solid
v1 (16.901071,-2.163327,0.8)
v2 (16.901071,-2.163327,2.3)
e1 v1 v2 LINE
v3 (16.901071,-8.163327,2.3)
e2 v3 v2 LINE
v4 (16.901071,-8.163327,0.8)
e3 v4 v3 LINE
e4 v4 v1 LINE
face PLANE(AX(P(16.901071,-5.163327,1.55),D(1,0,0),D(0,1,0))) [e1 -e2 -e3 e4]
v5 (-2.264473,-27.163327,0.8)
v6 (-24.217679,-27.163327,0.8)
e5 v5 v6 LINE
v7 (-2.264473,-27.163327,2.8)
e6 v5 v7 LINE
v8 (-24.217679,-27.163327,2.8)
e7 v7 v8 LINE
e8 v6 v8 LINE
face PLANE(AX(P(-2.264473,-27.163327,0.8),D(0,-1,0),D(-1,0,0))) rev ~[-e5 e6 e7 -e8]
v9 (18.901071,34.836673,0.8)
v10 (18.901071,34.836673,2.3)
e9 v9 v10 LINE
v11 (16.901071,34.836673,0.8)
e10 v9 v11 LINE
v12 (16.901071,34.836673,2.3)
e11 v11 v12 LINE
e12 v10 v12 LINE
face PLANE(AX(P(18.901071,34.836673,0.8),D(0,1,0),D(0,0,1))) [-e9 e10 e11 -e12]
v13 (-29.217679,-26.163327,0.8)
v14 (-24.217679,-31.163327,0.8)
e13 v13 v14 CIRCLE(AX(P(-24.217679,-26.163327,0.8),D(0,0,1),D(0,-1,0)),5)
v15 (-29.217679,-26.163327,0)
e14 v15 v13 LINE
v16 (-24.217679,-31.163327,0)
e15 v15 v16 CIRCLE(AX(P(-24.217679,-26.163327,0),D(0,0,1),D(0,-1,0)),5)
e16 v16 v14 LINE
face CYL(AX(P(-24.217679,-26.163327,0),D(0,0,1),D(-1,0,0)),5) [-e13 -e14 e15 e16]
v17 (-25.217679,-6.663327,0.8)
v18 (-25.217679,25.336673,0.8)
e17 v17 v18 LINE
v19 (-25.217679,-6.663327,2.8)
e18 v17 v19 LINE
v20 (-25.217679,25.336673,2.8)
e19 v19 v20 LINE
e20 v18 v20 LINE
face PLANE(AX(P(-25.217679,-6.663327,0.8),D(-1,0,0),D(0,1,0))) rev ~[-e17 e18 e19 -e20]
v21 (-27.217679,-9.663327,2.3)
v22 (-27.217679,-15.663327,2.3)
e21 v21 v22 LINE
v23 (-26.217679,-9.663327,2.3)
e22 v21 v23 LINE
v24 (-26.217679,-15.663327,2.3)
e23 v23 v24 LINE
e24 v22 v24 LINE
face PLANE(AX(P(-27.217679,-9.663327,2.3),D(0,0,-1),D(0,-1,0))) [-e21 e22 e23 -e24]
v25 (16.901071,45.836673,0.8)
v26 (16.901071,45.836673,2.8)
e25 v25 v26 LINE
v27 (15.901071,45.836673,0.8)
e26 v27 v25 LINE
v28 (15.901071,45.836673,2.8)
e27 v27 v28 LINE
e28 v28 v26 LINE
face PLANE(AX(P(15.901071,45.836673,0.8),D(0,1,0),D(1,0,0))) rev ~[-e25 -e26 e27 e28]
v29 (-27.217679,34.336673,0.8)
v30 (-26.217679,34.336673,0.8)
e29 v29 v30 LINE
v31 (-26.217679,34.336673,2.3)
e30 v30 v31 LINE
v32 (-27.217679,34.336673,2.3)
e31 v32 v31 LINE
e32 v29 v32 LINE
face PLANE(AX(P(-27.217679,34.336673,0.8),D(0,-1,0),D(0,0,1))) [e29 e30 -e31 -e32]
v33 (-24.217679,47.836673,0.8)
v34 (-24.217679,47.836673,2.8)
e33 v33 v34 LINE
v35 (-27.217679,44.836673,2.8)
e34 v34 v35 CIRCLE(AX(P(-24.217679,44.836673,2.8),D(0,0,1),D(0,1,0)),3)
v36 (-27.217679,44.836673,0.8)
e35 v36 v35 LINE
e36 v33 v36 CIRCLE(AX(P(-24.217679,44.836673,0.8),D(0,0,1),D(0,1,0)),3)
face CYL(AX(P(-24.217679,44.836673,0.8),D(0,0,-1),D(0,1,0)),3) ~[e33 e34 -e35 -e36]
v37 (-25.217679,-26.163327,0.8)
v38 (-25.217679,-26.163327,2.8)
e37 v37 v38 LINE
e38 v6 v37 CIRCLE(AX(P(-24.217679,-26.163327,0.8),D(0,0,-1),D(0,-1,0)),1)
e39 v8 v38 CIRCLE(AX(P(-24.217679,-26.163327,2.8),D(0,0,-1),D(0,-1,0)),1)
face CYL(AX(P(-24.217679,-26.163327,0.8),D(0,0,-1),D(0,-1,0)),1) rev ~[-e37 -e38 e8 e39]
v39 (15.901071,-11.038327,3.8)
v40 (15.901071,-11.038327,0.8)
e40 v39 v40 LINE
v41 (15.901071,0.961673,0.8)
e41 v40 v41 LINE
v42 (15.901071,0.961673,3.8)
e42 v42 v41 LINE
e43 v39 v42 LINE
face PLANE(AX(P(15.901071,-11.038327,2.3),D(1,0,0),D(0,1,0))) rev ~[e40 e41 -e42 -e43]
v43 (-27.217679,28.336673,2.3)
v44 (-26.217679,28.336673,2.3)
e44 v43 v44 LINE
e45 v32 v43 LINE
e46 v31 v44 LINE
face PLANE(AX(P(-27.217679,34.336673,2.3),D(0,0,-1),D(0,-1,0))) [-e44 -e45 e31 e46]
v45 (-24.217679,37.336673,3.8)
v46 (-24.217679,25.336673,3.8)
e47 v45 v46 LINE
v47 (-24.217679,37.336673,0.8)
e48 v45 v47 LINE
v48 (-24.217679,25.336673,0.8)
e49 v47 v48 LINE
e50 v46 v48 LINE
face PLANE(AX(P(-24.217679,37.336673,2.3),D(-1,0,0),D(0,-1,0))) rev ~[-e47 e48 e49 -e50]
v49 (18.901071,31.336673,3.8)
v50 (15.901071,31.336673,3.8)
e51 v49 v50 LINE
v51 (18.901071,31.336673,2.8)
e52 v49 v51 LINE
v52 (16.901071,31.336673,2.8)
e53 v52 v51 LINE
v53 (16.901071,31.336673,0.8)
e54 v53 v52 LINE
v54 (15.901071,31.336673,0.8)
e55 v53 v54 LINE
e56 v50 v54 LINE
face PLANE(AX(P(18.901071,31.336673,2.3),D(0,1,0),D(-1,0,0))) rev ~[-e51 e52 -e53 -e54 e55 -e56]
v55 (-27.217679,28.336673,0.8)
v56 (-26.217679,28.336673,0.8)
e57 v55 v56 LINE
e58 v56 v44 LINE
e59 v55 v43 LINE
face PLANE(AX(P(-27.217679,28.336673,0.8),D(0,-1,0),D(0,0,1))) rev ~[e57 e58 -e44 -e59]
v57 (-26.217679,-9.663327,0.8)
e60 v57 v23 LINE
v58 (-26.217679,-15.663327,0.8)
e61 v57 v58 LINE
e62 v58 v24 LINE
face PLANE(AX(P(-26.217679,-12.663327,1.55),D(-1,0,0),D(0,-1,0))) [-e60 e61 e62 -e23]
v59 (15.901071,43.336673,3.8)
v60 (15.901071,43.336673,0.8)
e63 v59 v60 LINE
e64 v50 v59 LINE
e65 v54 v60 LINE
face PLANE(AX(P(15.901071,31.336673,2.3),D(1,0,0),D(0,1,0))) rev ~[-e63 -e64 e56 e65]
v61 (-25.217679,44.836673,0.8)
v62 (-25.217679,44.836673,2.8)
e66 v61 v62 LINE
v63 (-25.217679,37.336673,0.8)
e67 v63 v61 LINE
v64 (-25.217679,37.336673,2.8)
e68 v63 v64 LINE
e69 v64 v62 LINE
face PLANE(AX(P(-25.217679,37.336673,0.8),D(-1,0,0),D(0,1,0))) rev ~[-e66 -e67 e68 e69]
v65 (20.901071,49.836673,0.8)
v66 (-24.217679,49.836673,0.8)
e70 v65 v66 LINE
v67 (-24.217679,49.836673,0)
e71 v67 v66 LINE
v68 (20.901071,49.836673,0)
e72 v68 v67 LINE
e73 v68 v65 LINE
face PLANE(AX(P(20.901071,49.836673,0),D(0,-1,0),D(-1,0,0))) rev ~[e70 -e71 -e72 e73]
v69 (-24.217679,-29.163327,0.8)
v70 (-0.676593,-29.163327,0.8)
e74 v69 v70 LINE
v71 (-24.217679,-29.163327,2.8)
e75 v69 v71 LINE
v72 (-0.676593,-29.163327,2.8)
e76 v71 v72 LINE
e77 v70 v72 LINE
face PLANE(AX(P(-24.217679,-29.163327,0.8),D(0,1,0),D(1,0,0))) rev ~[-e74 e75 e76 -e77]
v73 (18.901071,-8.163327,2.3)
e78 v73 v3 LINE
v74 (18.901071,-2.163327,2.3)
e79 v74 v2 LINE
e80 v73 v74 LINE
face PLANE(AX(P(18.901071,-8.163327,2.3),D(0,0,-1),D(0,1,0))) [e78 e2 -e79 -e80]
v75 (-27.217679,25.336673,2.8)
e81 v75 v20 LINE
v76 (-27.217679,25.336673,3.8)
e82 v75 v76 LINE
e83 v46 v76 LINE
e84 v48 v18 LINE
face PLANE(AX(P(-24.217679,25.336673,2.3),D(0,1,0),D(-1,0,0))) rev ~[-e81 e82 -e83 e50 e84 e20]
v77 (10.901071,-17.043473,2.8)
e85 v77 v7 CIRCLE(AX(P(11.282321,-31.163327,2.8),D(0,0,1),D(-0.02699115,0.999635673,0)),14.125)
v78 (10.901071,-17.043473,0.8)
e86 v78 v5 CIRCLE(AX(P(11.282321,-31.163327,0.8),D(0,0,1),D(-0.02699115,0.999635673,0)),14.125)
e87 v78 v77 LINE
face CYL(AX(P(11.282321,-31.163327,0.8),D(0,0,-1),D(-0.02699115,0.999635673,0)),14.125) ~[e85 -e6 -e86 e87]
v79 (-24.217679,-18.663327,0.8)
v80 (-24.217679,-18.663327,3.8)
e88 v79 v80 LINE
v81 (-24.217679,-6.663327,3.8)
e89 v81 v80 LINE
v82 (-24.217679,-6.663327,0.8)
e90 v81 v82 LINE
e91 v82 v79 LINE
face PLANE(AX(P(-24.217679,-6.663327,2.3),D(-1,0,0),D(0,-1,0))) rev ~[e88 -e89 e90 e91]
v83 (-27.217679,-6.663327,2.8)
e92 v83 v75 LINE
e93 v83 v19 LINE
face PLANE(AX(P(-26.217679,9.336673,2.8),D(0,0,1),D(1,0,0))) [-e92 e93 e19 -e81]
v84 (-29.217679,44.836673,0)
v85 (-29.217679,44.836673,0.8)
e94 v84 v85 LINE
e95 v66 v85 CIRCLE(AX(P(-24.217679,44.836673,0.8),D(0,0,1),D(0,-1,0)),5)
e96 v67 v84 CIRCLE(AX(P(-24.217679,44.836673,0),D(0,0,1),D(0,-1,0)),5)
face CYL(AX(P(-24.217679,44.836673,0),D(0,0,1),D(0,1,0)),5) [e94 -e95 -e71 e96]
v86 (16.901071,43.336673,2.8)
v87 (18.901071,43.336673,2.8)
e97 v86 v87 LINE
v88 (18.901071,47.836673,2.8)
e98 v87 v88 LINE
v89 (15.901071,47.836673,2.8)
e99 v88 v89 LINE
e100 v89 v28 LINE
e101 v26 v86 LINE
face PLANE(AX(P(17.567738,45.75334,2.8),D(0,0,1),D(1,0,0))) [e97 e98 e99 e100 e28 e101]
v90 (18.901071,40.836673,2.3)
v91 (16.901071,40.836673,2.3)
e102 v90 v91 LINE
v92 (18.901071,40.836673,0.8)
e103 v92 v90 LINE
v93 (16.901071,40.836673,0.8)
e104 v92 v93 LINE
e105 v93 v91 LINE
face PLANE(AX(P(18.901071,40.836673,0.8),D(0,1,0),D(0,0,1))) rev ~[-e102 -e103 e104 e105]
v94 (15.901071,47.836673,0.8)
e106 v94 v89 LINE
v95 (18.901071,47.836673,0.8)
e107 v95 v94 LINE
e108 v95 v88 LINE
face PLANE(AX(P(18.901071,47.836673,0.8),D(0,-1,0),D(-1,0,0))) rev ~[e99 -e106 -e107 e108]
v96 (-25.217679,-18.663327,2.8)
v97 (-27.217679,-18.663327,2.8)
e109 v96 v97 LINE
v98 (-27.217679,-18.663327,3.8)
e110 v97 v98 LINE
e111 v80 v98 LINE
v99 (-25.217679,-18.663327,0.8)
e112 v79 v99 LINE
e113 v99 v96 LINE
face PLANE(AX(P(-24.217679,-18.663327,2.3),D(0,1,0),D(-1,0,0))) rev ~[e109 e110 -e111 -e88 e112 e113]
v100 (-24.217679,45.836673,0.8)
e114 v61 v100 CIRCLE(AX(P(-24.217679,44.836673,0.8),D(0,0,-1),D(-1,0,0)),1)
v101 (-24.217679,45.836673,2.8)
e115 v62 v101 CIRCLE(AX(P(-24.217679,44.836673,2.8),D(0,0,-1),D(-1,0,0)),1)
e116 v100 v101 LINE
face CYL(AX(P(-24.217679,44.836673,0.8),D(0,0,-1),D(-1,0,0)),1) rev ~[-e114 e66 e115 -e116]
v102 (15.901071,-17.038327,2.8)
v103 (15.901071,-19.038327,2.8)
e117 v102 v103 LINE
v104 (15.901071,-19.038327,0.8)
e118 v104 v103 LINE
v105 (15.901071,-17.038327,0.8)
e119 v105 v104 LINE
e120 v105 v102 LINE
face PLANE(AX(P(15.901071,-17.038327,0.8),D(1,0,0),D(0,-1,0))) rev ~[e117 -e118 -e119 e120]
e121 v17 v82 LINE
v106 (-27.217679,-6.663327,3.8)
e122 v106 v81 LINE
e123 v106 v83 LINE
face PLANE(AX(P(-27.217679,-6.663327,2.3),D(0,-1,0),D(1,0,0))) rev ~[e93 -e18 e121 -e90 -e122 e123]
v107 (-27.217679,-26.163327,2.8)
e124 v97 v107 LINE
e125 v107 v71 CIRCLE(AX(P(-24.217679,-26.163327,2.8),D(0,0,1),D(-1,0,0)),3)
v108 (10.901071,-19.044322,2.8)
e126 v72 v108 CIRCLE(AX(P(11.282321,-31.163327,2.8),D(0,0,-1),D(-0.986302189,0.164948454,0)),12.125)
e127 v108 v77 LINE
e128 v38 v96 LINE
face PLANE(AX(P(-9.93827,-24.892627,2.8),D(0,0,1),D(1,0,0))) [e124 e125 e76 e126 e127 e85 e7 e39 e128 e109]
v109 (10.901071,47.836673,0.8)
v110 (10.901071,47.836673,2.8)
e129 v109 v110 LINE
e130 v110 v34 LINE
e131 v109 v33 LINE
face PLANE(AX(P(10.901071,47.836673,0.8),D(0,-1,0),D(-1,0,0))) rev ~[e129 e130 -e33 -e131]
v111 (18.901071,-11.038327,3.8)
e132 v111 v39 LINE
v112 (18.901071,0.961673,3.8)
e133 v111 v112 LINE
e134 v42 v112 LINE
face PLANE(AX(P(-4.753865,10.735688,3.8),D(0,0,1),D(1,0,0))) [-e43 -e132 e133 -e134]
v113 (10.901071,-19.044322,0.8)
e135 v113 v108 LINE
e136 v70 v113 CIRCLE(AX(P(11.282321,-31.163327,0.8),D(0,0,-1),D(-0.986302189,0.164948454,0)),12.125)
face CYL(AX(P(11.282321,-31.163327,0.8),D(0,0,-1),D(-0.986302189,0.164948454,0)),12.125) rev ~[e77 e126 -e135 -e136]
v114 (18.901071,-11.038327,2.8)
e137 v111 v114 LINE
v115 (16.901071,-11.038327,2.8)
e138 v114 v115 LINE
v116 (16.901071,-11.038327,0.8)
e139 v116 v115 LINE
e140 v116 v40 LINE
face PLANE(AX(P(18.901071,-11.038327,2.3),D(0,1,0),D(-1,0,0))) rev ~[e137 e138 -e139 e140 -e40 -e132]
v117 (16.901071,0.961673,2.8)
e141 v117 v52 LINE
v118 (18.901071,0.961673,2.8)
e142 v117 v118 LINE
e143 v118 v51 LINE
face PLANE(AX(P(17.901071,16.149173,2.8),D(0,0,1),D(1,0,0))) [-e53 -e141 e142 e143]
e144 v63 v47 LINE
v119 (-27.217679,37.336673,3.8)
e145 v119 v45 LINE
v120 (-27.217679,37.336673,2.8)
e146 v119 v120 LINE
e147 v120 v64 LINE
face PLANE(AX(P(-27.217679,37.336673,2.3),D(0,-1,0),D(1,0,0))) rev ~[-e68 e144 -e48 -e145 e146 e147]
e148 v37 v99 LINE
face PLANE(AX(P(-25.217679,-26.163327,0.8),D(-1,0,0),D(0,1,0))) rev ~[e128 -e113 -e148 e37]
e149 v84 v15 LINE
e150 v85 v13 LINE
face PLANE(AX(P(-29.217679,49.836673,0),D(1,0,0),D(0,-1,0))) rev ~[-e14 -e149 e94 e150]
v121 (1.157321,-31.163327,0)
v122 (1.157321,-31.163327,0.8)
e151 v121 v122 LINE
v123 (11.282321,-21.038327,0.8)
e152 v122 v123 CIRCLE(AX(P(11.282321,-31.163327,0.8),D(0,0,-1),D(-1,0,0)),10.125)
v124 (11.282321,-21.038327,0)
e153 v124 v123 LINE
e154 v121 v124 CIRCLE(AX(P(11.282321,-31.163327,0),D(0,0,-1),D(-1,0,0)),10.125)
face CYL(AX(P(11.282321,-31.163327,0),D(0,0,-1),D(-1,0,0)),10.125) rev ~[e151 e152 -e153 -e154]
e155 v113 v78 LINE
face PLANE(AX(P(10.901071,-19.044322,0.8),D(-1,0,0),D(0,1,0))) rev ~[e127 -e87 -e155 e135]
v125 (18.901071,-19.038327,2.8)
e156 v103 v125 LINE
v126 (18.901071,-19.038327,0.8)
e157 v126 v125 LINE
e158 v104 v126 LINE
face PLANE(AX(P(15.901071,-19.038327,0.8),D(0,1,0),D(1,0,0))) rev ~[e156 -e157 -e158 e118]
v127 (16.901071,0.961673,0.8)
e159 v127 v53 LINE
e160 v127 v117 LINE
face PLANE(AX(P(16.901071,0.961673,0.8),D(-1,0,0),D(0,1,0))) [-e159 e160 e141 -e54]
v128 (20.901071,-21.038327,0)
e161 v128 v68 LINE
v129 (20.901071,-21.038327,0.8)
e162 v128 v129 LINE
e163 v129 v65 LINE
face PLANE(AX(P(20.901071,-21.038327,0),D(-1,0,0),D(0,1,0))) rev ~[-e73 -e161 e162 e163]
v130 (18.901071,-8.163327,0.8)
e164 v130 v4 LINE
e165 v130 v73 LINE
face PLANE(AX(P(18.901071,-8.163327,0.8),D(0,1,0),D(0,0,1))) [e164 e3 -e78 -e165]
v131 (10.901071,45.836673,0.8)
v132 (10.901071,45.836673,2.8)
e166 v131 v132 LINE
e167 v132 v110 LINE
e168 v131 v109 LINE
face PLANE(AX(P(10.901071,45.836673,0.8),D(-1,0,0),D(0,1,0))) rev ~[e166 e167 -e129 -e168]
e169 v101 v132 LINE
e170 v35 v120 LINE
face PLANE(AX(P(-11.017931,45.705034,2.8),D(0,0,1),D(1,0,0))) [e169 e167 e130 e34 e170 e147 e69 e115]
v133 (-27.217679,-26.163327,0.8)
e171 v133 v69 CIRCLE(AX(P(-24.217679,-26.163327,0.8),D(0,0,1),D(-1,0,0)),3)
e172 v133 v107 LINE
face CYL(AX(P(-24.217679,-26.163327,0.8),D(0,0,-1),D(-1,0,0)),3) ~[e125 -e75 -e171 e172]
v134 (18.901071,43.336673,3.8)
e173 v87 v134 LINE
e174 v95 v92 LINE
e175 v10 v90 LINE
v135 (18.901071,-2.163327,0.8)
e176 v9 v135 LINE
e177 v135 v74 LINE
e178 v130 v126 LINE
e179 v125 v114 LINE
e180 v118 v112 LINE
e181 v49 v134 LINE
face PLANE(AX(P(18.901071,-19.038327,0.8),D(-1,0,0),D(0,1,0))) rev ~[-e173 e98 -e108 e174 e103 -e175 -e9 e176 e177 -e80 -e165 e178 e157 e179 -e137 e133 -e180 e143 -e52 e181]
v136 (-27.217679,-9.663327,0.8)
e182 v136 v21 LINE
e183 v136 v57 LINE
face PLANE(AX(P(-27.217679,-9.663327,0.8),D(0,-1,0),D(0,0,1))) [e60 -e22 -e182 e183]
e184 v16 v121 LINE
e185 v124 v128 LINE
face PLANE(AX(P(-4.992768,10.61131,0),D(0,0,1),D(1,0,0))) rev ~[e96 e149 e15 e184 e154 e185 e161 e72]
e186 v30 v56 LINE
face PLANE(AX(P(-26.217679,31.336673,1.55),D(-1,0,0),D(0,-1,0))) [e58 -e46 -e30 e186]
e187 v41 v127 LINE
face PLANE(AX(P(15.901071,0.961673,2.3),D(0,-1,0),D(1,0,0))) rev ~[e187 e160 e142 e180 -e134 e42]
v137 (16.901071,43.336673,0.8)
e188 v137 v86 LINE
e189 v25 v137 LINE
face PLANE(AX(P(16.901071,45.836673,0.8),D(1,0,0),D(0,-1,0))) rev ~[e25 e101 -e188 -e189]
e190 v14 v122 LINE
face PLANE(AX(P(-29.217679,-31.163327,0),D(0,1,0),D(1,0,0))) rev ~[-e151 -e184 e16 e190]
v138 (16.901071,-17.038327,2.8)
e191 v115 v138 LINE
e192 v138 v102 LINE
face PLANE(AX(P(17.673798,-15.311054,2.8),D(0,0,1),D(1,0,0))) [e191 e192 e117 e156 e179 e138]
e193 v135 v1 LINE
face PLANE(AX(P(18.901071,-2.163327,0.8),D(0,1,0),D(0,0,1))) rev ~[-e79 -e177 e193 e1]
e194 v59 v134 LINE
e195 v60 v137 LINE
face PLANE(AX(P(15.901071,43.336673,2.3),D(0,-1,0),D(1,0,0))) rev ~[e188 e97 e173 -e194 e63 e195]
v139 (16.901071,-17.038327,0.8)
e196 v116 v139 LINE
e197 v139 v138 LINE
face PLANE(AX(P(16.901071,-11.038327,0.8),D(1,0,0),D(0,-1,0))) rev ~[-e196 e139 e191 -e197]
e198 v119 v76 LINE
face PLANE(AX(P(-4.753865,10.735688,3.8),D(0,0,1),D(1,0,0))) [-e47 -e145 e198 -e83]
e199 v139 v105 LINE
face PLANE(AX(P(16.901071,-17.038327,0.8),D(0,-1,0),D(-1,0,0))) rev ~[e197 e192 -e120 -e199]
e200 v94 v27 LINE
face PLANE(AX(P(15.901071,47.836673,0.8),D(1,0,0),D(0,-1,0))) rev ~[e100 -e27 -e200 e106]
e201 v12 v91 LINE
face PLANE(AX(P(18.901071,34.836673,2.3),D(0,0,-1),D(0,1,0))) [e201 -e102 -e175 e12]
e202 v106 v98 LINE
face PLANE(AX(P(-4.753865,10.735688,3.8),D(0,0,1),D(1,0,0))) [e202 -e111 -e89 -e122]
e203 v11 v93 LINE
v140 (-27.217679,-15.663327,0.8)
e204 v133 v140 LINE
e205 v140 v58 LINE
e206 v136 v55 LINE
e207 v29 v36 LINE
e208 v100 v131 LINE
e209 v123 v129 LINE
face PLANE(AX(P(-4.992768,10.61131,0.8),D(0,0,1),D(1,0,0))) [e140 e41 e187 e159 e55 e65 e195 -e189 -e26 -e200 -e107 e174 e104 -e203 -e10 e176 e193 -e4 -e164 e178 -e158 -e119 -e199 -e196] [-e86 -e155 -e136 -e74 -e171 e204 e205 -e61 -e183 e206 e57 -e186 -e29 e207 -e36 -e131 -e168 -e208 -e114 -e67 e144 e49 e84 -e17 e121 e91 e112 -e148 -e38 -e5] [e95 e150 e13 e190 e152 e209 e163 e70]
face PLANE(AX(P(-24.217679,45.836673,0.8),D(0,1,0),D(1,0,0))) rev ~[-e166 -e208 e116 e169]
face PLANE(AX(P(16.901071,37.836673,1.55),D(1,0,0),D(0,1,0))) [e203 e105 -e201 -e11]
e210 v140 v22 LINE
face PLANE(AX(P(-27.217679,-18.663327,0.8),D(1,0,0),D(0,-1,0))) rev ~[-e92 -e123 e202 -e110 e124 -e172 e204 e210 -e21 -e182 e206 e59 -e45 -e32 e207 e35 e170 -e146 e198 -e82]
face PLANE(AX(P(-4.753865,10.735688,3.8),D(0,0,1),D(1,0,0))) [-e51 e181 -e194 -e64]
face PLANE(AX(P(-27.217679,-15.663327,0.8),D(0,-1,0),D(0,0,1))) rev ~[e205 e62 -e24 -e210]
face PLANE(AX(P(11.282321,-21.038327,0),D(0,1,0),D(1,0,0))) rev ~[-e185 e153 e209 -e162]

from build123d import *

# Parameters (mm, degrees)
F1_DEPTH  = 0.8
F2_R      = 5
F3_R      = 5
F5_DEPTH  = 3
F8_W      = 6
F8_H      = 1.5
F9_DEPTH  = 2
F11_DEPTH = 1.5
F12_DEPTH = 1.5
F6_W      = 6
F6_H      = 1.5
F13_DEPTH = 1
F14_W     = 2
F14_H     = 32
F14_H_2   = 30.375
F15_DEPTH = 2


# Not quite as in the source:
# - an extrude ends at something that could not be found from the text; its depth is read off the source's solid


with BuildPart() as f1:
    # F0 (on Top) → F1 (new body)
    with BuildSketch(Plane.XY):
        with BuildLine():
            Line((20.9010709455, 49.8366734011), (-29.2176790545, 49.8366734011))
            Line((-29.2176790545, 49.8366734011), (-29.2176790545, -31.1633265989))
            Line((-29.2176790545, -31.1633265989), (1.1573209455, -31.1633265989))
            ThreePointArc((1.1573209455, -31.1633265989), (4.122864786, -24.0038704394), (11.2823209455, -21.0383265989))
            Line((11.2823209455, -21.0383265989), (20.9010709455, -21.0383265989))
            Line((20.9010709455, -21.0383265989), (20.9010709455, 49.8366734011))
        make_face()
    extrude(amount=F1_DEPTH)

    # F2
    f2_edges = [f1.edges().sort_by_distance(p)[0] for p in [
        (-29.217679, 49.836673, 0.4),
    ]]
    fillet(f2_edges, radius=F2_R)

    # F3
    f3_edges = [f1.edges().sort_by_distance(p)[0] for p in [
        (-29.217679, -31.163327, 0.4),
    ]]
    fillet(f3_edges, radius=F3_R)

    # F4 (on face) → F5 (join)
    with BuildSketch(Plane.XY.offset(0.8)):
        with BuildLine():
            ThreePointArc((-24.2176790545, 47.8366734011), (-26.338999398, 46.9579937447), (-27.2176790545, 44.8366734011))
            Line((-27.2176790545, 44.8366734011), (-27.2176790545, -26.1633265989))
            ThreePointArc((-27.2176790545, -26.1633265989), (-26.338999398, -28.2846469425), (-24.2176790545, -29.1633265989))
            Line((-24.2176790545, -29.1633265989), (-0.6765930938, -29.1633265989))
            ThreePointArc((-0.6765930938, -29.1633265989), (3.4476025396, -21.9095267037), (11.2823209455, -19.0383265989))
            Line((11.2823209455, -19.0383265989), (18.9010709455, -19.0383265989))
            Line((18.9010709455, -19.0383265989), (18.9010709455, 47.8366734011))
            Line((18.9010709455, 47.8366734011), (-24.2176790545, 47.8366734011))
        make_face()
    extrude(amount=F5_DEPTH)

    # F8 (on face) → F9 (cut)
    with BuildSketch(Plane.YZ.offset(18.9010709455)):
        with Locations((-5.1633265989, 1.55)):
            Rectangle(F8_W, F8_H)
        with Locations((37.8366734011, 1.55)):
            Rectangle(F8_W, F8_H)
    extrude(amount=-F9_DEPTH, mode=Mode.SUBTRACT)

    # F10 (on face) → F11 (cut)
    with BuildSketch(Plane.XY.offset(3.8)):
        with BuildLine():
            Line((-24.2176790545, -18.6633265989), (-27.2176790545, -18.6633265989))
            Line((-27.2176790545, -18.6633265989), (-27.2176790545, -26.1633265989))
            ThreePointArc((-27.2176790545, -26.1633265989), (-26.338999398, -28.2846469425), (-24.2176790545, -29.1633265989))
            Line((-24.2176790545, -29.1633265989), (-0.6765930938, -29.1633265989))
            ThreePointArc((-0.6765930938, -29.1633265989), (3.4476025396, -21.9095267037), (11.2823209455, -19.0383265989))
            Line((11.2823209455, -19.0383265989), (18.9010709455, -19.0383265989))
            Line((18.9010709455, -19.0383265989), (18.9010709455, -11.0383265989))
            Line((18.9010709455, -11.0383265989), (15.9010709455, -11.0383265989))
            Line((15.9010709455, -11.0383265989), (15.9010709455, 0.9616734011))
            Line((15.9010709455, 0.9616734011), (18.9010709455, 0.9616734011))
            Line((18.9010709455, 0.9616734011), (18.9010709455, 31.3366734011))
            Line((18.9010709455, 31.3366734011), (15.9010709455, 31.3366734011))
            Line((15.9010709455, 31.3366734011), (15.9010709455, 43.3366734011))
            Line((15.9010709455, 43.3366734011), (18.9010709455, 43.3366734011))
            Line((18.9010709455, 43.3366734011), (18.9010709455, 47.8366734011))
            Line((18.9010709455, 47.8366734011), (-24.2176790545, 47.8366734011))
            ThreePointArc((-24.2176790545, 47.8366734011), (-26.338999398, 46.9579937447), (-27.2176790545, 44.8366734011))
            Line((-27.2176790545, 44.8366734011), (-27.2176790545, 37.3366734011))
            Line((-27.2176790545, 37.3366734011), (-24.2176790545, 37.3366734011))
            Line((-24.2176790545, 37.3366734011), (-24.2176790545, 25.3366734011))
            Line((-24.2176790545, 25.3366734011), (-27.2176790545, 25.3366734011))
            Line((-27.2176790545, 25.3366734011), (-27.2176790545, -6.6633265989))
            Line((-27.2176790545, -6.6633265989), (-24.2176790545, -6.6633265989))
            Line((-24.2176790545, -6.6633265989), (-24.2176790545, -18.6633265989))
        make_face()
    extrude(amount=-F11_DEPTH, mode=Mode.SUBTRACT)

    # F12 (cut, through all): a face of the model
    f12_faces = [f1.faces().sort_by_distance(p)[0] for p in [
        (-4.8878926555, 10.949585375, 2.3),
    ]]
    extrude(f12_faces, amount=-F12_DEPTH, mode=Mode.SUBTRACT)

    # F6 (on face) → F13 (cut)
    with BuildSketch(Plane(origin=(-27.2176790545, 0, 0), x_dir=(0, -1, 0), z_dir=(-1, 0, 0))):
        with Locations((-31.3366734011, 1.55)):
            Rectangle(F6_W, F6_H)
        with Locations((12.6633265989, 1.55)):
            Rectangle(F6_W, F6_H)
    extrude(amount=-F13_DEPTH, mode=Mode.SUBTRACT)

    # F14 (on face) → F15 (join)
    with BuildSketch(Plane.XY.offset(0.8)):
        with BuildLine():
            Line((-24.2176790545, -29.1633265989), (-0.6765930938, -29.1633265989))
            ThreePointArc((-0.6765930938, -29.1633265989), (3.3030681077, -22.0338606151), (10.9010709455, -19.04432196))
            Line((10.9010709455, -19.04432196), (10.9010709455, -17.0434727244))
            ThreePointArc((10.9010709455, -17.0434727244), (2.6741584042, -19.9644354635), (-2.2644729556, -27.1633265989))
            Line((-2.2644729556, -27.1633265989), (-24.2176790545, -27.1633265989))
            ThreePointArc((-24.2176790545, -27.1633265989), (-24.9247858357, -26.8704333801), (-25.2176790545, -26.1633265989))
            Line((-25.2176790545, -26.1633265989), (-25.2176790545, -18.6633265989))
            Line((-25.2176790545, -18.6633265989), (-27.2176790545, -18.6633265989))
            Line((-27.2176790545, -18.6633265989), (-27.2176790545, -26.1633265989))
            ThreePointArc((-27.2176790545, -26.1633265989), (-26.338999398, -28.2846469425), (-24.2176790545, -29.1633265989))
        make_face()
        Polygon((15.9010709455, -17.0383265989), (15.9010709455, -19.0383265989), (18.9010709455, -19.0383265989), (18.9010709455, -11.0383265989), (16.9010709455, -11.0383265989), (16.9010709455, -17.0383265989), align=None)
        Polygon((18.9010709455, 43.3366734011), (18.9010709455, 47.8366734011), (15.9010709455, 47.8366734011), (15.9010709455, 45.8366734011), (16.9010709455, 45.8366734011), (16.9010709455, 43.3366734011), align=None)
        with BuildLine():
            Line((10.9010709455, 47.8366734011), (-24.2176790545, 47.8366734011))
            ThreePointArc((-24.2176790545, 47.8366734011), (-26.338999398, 46.9579937447), (-27.2176790545, 44.8366734011))
            Line((-27.2176790545, 44.8366734011), (-27.2176790545, 37.3366734011))
            Line((-27.2176790545, 37.3366734011), (-25.2176790545, 37.3366734011))
            Line((-25.2176790545, 37.3366734011), (-25.2176790545, 44.8366734011))
            ThreePointArc((-25.2176790545, 44.8366734011), (-24.9247858357, 45.5437801823), (-24.2176790545, 45.8366734011))
            Line((-24.2176790545, 45.8366734011), (10.9010709455, 45.8366734011))
            Line((10.9010709455, 45.8366734011), (10.9010709455, 47.8366734011))
        make_face()
        with Locations((-26.2176790545, 9.3366734011)):
            Rectangle(F14_W, F14_H)
        with Locations((17.9010709455, 16.1491734011)):
            Rectangle(F14_W, F14_H_2)
    extrude(amount=F15_DEPTH)


solid = f1.part
